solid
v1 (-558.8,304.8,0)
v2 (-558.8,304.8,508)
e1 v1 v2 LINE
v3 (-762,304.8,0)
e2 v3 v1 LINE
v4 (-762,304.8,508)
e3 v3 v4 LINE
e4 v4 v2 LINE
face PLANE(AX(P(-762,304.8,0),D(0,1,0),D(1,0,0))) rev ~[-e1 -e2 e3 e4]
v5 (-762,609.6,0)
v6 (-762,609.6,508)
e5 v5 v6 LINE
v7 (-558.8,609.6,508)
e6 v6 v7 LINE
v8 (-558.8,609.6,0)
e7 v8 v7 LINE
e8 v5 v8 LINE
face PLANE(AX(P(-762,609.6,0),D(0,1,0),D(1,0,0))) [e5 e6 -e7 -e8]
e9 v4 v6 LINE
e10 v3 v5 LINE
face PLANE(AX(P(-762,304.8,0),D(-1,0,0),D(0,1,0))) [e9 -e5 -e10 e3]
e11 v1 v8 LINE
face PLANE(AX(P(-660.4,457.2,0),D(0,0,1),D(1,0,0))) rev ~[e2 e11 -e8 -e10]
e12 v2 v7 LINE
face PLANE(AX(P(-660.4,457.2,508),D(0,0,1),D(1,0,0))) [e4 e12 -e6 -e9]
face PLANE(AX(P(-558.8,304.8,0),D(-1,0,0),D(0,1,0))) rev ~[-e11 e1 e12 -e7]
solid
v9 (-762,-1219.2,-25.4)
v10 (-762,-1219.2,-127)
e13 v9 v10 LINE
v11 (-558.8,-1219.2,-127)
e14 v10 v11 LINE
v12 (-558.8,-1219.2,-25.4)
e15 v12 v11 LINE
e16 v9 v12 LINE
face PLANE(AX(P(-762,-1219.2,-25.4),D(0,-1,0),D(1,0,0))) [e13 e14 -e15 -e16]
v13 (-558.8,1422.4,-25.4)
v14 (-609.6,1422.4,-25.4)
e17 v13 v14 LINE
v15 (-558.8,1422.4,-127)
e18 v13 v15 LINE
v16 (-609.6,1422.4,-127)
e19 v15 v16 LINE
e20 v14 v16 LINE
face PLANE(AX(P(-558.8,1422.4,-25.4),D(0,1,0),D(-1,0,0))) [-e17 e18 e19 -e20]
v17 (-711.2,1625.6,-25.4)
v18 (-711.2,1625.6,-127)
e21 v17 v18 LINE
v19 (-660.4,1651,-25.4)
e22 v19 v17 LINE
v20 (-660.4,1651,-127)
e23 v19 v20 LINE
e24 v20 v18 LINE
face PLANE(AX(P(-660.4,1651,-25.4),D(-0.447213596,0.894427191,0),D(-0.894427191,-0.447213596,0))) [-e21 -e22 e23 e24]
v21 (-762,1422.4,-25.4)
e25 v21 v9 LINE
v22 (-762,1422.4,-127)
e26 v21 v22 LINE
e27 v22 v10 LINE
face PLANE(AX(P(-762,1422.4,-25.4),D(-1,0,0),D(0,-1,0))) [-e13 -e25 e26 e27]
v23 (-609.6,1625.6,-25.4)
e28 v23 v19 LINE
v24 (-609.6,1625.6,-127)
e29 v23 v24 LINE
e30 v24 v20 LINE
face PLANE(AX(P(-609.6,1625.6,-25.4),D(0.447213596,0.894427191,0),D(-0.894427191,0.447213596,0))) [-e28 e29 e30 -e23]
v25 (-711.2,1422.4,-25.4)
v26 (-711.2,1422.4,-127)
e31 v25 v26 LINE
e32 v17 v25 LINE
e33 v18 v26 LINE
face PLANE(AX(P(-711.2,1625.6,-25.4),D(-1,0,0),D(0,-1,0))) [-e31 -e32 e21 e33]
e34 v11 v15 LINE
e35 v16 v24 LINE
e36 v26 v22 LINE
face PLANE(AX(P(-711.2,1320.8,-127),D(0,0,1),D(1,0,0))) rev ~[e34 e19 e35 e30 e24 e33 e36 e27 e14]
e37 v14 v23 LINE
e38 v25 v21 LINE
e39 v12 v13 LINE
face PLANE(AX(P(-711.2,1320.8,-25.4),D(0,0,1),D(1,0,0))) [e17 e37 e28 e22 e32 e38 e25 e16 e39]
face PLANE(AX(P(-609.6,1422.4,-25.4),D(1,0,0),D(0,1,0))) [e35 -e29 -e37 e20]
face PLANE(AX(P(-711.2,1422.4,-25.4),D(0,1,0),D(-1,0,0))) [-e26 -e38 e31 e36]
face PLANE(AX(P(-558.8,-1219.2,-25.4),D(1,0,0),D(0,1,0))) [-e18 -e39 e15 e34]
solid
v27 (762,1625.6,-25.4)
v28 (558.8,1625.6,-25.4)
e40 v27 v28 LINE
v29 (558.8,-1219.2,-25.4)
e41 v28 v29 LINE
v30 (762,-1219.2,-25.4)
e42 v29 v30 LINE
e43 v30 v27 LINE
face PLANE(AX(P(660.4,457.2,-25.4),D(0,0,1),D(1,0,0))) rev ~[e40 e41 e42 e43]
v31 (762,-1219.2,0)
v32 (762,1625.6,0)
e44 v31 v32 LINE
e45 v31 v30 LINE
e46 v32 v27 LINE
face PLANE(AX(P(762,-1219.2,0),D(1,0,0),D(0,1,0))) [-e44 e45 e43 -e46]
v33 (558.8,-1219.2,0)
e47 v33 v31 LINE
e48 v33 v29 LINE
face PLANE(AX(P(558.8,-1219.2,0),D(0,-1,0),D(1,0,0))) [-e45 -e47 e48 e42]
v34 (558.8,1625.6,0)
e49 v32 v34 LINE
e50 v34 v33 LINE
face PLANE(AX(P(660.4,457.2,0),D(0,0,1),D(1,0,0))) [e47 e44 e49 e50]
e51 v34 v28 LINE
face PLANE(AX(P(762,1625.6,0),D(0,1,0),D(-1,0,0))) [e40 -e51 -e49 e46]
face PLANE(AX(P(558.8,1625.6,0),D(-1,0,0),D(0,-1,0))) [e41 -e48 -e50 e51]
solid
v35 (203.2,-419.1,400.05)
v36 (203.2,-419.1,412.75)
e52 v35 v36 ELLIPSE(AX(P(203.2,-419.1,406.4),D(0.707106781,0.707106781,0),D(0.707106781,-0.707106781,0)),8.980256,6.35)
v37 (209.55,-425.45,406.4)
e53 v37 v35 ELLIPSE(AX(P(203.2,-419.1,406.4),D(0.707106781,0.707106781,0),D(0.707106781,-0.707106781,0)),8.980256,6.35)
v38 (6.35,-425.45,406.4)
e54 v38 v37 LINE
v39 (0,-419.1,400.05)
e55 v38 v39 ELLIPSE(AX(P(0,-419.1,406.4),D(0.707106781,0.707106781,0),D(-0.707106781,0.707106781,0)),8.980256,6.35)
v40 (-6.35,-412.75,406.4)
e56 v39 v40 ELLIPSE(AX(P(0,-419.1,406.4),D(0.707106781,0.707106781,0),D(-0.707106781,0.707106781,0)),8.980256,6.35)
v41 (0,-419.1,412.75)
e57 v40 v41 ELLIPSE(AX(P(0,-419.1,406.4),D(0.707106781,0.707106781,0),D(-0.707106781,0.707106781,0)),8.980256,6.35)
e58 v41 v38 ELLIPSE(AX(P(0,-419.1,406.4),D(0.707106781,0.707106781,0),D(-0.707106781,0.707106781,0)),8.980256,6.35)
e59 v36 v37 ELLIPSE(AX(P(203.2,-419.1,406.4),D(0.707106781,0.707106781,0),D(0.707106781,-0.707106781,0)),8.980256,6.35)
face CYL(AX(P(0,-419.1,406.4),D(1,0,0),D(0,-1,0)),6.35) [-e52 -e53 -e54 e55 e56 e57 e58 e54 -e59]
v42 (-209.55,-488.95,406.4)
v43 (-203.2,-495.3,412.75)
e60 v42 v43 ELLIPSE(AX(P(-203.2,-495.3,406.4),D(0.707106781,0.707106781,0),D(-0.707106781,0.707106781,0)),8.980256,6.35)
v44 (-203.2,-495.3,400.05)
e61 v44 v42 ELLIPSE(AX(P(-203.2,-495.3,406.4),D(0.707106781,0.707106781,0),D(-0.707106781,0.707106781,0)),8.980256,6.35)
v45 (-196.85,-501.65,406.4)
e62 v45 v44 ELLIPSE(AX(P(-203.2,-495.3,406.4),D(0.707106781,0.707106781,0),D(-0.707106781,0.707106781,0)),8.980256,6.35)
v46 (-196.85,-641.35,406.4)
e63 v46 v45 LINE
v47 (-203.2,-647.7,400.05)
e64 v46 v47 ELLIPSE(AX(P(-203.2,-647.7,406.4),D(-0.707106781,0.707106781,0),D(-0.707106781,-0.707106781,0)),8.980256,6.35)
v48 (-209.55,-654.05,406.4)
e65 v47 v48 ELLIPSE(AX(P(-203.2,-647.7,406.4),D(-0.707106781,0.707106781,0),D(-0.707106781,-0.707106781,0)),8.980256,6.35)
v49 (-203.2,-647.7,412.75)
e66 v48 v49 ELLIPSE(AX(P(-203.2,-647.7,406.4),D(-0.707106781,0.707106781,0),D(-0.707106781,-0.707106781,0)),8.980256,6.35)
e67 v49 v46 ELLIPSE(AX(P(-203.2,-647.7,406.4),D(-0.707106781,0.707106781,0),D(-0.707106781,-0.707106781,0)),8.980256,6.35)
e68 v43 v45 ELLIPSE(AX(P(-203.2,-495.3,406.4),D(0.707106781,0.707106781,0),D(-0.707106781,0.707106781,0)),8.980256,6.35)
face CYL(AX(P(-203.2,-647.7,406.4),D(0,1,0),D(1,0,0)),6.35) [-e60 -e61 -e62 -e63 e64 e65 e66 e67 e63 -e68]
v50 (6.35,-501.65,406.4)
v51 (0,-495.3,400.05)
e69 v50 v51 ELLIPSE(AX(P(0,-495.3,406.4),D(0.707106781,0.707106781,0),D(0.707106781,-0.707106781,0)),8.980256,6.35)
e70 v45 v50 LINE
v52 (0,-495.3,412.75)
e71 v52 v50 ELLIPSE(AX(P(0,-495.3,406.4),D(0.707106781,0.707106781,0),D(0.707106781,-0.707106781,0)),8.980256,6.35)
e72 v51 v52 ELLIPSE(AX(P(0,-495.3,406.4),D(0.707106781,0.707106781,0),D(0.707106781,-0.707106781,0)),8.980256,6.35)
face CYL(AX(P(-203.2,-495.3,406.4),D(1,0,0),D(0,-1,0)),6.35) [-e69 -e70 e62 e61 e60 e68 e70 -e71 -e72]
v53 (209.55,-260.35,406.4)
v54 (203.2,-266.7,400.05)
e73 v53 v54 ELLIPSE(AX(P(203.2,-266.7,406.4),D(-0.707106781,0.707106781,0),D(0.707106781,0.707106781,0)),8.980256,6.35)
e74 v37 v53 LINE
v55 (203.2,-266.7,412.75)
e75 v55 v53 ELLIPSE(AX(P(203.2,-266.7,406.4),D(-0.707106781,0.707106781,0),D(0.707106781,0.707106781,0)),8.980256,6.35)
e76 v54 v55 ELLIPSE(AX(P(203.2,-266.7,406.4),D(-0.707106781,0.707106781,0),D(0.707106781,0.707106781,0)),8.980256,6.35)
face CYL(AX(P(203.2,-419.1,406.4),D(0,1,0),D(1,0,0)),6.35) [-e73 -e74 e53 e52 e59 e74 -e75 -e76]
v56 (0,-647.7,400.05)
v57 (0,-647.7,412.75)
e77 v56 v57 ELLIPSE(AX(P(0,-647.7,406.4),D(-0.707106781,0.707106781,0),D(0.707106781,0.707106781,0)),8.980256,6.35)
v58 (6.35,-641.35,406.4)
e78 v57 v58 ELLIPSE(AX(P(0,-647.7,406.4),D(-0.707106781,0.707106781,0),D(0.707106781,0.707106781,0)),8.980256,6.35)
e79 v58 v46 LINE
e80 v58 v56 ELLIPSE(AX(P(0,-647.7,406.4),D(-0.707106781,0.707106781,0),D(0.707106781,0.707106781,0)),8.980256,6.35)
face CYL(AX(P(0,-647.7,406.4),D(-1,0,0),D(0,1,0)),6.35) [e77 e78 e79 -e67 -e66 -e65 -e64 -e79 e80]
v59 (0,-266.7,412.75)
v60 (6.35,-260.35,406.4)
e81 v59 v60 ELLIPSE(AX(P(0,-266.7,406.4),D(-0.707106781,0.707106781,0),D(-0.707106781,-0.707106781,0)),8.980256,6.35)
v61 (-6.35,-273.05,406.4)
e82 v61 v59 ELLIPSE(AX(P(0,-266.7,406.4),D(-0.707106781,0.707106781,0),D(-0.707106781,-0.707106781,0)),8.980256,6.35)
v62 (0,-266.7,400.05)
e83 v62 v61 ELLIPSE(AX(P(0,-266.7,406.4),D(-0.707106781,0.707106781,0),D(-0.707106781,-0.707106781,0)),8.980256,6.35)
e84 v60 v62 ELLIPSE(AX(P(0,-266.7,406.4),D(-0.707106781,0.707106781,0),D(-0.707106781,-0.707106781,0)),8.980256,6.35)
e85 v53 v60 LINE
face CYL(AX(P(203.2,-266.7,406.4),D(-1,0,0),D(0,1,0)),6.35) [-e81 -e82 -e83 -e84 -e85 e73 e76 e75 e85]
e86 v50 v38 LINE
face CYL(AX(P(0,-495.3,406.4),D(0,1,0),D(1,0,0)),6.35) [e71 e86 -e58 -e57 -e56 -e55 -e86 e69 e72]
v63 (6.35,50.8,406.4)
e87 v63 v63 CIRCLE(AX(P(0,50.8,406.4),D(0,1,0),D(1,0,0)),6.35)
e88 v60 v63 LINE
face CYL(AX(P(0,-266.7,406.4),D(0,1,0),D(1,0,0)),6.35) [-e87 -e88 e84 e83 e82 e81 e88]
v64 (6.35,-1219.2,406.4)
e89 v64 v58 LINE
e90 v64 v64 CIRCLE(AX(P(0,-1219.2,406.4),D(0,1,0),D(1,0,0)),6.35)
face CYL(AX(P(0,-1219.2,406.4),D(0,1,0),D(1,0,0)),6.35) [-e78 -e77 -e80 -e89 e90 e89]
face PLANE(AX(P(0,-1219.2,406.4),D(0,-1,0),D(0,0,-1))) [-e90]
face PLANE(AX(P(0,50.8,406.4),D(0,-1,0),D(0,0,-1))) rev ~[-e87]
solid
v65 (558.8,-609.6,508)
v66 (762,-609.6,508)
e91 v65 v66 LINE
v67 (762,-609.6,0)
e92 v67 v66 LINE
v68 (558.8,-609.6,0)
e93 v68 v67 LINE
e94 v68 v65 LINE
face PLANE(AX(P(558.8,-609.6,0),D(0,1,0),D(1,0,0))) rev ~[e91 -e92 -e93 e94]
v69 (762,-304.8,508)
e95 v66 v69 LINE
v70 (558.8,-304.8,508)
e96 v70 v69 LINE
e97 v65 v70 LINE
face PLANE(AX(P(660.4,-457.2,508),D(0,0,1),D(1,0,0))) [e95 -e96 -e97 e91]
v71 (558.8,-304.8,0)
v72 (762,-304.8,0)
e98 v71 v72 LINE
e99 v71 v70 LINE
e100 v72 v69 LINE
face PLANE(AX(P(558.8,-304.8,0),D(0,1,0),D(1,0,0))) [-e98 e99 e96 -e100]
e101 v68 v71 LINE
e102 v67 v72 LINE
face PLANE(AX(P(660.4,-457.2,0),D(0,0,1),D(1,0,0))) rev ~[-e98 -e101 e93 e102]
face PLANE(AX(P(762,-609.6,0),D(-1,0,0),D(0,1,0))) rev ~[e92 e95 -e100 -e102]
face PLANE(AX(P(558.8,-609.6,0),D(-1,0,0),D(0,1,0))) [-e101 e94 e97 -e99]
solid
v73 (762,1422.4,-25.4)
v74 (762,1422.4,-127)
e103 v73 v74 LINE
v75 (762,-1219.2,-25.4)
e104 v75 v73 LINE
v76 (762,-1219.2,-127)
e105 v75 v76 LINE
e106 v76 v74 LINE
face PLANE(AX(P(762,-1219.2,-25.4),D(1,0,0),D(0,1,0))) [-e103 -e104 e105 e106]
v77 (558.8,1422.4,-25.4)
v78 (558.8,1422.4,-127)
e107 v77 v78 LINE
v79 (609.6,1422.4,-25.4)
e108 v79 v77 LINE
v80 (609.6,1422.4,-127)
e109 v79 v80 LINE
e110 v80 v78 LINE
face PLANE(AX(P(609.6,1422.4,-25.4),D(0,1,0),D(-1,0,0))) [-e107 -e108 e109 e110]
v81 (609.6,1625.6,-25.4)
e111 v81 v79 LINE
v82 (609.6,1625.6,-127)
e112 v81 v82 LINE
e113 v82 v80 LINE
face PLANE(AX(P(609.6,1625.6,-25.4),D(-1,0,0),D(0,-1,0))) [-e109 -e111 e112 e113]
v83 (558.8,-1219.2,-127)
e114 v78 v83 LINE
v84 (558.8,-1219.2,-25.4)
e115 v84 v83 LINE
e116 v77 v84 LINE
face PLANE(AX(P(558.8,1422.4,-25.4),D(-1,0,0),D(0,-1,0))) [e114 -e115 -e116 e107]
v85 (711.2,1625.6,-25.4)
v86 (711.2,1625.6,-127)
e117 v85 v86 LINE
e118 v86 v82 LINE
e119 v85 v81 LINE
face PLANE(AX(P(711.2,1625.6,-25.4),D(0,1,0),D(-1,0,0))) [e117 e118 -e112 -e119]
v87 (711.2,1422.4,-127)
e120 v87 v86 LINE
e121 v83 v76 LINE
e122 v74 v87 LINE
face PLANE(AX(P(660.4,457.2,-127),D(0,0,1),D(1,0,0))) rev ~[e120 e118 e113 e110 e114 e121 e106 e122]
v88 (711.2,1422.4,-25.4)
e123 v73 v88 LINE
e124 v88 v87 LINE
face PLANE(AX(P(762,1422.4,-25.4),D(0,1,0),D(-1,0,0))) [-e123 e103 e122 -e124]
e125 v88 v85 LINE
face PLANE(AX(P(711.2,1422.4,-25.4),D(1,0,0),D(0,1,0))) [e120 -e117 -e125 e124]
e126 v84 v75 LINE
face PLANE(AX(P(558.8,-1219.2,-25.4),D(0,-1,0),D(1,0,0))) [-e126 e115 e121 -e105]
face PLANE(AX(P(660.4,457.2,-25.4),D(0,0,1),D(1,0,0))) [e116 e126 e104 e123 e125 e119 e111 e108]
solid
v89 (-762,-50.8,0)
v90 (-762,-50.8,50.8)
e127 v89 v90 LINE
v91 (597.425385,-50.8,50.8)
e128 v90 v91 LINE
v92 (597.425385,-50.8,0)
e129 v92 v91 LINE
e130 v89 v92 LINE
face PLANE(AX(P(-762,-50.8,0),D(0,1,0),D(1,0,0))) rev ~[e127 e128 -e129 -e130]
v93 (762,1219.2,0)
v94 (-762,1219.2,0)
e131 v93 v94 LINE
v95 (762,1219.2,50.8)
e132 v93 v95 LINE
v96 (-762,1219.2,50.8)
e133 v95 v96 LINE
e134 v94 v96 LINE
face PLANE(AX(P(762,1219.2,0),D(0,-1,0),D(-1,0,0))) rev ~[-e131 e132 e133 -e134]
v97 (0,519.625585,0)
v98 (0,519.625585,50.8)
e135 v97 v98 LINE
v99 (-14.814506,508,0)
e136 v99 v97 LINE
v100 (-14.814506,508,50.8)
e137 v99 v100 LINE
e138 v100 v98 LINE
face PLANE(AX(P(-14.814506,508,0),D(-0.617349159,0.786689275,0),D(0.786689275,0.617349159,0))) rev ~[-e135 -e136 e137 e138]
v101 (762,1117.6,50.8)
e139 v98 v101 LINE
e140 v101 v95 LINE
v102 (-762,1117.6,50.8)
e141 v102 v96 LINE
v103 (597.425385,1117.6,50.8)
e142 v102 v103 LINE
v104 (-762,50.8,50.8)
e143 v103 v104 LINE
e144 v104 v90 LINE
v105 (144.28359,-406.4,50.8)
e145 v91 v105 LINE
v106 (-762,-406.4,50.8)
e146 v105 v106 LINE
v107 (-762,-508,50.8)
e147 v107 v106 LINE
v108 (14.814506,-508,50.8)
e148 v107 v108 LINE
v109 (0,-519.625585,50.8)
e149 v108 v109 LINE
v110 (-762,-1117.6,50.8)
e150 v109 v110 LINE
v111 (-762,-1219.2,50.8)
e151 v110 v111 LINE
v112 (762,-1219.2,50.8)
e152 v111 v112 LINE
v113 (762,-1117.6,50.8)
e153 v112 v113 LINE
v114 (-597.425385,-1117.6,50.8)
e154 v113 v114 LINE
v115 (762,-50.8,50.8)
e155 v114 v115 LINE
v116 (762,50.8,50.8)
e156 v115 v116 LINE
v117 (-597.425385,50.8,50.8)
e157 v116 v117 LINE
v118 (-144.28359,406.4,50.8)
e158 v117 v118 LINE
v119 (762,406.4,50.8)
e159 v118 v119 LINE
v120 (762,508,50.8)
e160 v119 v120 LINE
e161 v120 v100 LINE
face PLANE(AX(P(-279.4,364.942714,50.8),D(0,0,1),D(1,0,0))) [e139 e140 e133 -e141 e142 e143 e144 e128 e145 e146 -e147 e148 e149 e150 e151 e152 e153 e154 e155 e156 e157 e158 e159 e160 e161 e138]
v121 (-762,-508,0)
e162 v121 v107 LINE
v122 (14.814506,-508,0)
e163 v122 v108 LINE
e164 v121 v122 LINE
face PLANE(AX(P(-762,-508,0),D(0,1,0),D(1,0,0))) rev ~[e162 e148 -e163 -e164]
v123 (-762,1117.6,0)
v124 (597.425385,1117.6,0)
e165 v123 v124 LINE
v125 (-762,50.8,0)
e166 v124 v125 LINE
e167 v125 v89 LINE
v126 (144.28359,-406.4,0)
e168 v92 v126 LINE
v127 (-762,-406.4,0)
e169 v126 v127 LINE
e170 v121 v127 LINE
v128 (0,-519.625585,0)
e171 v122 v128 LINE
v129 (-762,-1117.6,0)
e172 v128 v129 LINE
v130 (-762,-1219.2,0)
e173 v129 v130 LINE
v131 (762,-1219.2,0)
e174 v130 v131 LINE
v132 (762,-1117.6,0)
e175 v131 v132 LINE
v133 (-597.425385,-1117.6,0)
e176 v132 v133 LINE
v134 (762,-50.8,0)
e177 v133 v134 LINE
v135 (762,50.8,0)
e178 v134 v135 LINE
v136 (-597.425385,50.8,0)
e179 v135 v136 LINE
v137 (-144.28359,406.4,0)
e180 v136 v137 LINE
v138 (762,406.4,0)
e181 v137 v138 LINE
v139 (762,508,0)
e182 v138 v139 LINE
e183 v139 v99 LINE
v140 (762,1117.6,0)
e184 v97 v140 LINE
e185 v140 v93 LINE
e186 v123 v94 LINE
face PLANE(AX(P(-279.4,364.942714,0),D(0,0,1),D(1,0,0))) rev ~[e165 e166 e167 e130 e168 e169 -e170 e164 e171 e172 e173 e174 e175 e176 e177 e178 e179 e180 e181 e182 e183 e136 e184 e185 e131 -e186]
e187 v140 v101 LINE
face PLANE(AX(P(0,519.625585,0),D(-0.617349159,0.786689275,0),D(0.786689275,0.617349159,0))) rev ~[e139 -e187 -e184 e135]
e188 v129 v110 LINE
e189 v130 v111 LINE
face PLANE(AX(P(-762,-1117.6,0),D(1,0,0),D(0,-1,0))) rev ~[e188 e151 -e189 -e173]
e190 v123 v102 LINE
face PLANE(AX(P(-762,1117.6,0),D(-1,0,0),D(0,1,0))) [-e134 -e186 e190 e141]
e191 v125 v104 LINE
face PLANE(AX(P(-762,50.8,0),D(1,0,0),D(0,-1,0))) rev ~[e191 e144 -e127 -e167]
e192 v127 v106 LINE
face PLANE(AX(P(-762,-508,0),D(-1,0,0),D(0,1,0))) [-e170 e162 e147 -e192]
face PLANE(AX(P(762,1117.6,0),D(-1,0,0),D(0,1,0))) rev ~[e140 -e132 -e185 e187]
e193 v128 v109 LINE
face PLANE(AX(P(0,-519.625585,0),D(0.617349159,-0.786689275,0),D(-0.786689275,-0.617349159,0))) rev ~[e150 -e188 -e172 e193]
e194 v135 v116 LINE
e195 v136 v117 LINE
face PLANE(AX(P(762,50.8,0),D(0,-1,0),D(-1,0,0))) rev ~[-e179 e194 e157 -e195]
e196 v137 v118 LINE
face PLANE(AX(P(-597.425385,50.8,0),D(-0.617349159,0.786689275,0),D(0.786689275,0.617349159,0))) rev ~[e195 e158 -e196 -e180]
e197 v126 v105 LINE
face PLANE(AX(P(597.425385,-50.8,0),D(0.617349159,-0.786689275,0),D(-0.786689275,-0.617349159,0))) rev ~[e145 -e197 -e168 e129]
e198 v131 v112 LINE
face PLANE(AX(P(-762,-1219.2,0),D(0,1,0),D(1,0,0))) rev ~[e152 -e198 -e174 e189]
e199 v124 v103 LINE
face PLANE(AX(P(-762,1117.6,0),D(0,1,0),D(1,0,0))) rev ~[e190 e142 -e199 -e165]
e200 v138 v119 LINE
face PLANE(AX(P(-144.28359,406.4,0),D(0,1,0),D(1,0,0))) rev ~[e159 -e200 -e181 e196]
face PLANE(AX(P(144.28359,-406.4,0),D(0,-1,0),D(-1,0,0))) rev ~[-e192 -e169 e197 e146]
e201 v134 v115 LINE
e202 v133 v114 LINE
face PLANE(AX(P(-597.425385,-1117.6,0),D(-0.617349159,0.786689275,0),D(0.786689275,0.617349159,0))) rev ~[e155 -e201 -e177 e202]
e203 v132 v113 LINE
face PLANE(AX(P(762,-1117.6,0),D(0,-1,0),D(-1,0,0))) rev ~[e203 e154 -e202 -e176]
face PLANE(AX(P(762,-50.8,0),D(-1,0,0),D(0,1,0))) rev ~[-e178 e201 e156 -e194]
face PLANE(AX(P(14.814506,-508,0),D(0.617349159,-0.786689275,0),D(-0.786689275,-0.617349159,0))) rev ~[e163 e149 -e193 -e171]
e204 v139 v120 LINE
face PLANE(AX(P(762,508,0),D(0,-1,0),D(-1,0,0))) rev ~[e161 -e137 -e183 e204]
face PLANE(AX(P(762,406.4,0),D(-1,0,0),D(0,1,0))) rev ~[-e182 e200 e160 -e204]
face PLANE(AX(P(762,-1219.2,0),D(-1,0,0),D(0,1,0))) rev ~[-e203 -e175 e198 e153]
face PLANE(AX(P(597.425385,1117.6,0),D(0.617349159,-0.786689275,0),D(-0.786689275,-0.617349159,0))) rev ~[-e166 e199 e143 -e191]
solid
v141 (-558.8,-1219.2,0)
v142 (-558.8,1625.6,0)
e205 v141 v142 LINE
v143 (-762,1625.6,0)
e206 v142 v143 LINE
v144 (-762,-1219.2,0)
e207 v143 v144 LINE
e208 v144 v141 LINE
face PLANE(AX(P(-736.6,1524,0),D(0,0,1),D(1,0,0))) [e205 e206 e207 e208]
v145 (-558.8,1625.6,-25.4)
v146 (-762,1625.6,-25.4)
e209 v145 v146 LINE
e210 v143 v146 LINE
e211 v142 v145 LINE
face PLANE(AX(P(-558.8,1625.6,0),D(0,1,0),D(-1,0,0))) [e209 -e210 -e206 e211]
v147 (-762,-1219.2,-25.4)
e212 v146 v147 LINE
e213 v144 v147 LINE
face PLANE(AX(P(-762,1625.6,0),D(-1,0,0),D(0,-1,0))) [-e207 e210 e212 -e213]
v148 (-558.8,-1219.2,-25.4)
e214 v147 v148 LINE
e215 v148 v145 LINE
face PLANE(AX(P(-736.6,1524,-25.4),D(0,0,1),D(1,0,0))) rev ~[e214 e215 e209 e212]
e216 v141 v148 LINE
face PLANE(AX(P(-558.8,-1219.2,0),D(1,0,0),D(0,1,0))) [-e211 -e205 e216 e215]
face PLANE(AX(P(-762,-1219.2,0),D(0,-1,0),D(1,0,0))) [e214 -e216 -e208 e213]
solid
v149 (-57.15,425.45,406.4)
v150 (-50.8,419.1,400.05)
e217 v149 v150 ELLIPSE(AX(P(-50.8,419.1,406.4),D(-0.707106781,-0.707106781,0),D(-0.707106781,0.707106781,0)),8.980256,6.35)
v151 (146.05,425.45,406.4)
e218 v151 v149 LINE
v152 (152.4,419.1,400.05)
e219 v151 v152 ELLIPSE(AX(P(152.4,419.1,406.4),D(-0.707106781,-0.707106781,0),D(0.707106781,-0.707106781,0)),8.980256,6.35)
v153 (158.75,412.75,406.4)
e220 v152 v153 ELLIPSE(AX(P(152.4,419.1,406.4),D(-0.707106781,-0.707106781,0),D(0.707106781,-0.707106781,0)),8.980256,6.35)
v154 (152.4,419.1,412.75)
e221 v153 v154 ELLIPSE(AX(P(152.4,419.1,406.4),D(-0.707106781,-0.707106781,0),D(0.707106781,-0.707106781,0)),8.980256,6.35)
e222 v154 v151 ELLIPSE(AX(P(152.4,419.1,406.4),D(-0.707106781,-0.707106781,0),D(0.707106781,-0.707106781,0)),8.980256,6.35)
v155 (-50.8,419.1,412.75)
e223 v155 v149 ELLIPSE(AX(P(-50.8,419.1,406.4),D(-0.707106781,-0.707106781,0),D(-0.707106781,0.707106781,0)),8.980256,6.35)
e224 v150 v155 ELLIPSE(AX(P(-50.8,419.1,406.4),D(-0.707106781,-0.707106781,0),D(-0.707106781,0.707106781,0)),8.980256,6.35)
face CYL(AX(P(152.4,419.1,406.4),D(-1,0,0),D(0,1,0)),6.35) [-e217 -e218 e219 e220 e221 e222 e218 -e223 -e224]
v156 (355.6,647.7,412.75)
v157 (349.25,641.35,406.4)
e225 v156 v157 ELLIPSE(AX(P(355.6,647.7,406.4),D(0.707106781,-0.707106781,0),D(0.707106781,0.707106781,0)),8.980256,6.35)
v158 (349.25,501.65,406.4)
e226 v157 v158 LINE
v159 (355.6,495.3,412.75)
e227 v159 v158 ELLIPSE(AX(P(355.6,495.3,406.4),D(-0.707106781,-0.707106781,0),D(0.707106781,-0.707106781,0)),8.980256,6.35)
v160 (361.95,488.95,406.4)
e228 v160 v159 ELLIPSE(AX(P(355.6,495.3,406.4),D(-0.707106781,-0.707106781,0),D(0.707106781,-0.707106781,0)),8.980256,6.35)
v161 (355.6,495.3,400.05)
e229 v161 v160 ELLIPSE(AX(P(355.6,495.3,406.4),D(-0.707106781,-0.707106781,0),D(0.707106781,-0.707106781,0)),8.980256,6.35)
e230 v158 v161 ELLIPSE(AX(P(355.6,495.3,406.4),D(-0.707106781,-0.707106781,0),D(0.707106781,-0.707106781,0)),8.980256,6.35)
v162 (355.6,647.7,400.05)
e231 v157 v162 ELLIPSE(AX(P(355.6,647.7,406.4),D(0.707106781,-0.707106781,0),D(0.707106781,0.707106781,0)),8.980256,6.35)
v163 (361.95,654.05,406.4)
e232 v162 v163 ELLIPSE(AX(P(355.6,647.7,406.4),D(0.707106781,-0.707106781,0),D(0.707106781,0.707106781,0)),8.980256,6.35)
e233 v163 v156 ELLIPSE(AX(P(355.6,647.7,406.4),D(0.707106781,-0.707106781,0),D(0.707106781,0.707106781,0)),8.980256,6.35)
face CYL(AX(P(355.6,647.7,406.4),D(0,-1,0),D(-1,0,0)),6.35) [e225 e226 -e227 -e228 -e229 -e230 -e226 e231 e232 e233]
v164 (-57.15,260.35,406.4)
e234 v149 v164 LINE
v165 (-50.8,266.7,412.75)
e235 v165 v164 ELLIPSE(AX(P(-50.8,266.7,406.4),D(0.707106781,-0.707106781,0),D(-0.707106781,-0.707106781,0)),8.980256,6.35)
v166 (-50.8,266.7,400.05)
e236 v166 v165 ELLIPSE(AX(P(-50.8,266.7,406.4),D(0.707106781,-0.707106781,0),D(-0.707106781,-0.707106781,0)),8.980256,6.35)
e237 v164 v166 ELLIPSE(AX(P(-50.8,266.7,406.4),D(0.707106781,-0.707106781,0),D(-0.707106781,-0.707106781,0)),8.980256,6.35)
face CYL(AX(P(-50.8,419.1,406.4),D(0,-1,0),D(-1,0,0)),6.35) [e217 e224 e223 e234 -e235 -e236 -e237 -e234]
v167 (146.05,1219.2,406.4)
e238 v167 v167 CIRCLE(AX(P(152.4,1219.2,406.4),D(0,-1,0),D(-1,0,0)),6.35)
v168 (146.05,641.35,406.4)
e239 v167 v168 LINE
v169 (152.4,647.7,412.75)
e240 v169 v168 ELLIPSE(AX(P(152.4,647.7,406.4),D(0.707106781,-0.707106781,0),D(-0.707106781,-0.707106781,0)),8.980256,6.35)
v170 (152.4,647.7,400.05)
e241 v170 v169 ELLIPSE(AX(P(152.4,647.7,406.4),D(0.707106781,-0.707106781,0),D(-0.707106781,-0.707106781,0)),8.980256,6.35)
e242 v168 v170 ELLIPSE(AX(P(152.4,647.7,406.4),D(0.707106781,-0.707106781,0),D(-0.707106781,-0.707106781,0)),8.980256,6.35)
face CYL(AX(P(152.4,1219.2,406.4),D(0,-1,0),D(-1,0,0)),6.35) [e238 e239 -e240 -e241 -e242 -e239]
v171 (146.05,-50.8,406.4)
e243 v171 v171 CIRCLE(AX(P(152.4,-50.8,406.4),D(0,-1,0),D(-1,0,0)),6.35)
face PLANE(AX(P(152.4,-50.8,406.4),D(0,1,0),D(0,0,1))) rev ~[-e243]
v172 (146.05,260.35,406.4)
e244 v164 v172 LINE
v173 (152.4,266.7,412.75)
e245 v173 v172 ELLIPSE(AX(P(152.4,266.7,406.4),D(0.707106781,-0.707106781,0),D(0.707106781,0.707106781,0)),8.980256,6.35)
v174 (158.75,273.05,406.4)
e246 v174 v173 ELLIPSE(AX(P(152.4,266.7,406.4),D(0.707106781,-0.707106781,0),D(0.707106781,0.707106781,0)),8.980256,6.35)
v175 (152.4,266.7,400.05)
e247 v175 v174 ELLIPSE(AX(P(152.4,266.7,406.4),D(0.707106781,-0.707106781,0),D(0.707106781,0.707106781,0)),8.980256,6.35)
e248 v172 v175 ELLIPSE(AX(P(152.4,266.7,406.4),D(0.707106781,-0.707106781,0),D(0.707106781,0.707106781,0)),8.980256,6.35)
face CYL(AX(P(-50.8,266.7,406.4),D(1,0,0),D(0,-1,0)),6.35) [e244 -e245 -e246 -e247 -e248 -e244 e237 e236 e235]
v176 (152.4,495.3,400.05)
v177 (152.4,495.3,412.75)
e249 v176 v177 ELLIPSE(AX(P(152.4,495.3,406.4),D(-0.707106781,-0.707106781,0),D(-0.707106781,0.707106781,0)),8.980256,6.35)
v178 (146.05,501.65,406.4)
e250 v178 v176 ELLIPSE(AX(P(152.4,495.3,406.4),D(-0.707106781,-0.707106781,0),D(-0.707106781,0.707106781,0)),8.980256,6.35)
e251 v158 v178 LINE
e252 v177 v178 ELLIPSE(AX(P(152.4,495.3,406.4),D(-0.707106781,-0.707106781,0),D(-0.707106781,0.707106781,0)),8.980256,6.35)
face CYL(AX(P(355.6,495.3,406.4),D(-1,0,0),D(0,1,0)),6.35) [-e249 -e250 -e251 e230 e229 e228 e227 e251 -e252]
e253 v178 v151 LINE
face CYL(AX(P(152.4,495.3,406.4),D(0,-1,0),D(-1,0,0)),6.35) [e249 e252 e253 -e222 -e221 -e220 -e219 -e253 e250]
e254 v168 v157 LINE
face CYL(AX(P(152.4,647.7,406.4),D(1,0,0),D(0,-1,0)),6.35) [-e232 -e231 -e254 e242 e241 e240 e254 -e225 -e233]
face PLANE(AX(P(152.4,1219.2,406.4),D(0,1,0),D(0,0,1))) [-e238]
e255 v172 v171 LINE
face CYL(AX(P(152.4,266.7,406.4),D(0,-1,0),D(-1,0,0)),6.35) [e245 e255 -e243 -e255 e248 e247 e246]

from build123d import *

# Parameters (mm, degrees)
F2_START = -25.4
F1_W     = 203.2
F1_H     = 304.8
F1_H_2   = 1524
F2_DEPTH = 101.6
F1_H_3   = 609.6
F3_DEPTH = 508
F4_DEPTH = 508
F1_W_2   = 50.8
F1_H_4   = 203.2
F6_DEPTH = 25.4
F7_W     = 558.8
F7_H     = 101.6
F7_W_2   = 203.2
F8_DEPTH = 50.8
F12_R    = 6.35
F14_R    = 6.35


with BuildPart() as f2:
    # F1 (on Top) → F2 (new body)
    with BuildSketch(Plane.XY.offset(F2_START)):
        Polygon((-762, 1422.4), (-762, 1219.2), (-660.4, 1219.2), (-660.4, 1422.4), (-711.2, 1422.4), align=None)
        Polygon((-660.4, 1219.2), (-762, 1219.2), (-762, 609.6), (-558.8, 609.6), (-558.8, 1219.2), align=None)
        Polygon((-660.4, 1422.4), (-660.4, 1219.2), (-558.8, 1219.2), (-558.8, 1422.4), (-609.6, 1422.4), align=None)
        with Locations((-660.4, 457.2)):
            Rectangle(F1_W, F1_H)
        Polygon((-711.2, 1422.4), (-660.4, 1422.4), (-609.6, 1422.4), (-609.6, 1625.6), (-711.2, 1625.6), align=None)
        with Locations((-660.4, -457.2)):
            Rectangle(F1_W, F1_H_2)
        Polygon((-660.4, 1651), (-711.2, 1625.6), (-609.6, 1625.6), align=None)
    extrude(amount=-F2_DEPTH)


with BuildPart() as f2b:
    # F1 (on Top) → F2, piece 2 (new body)
    with BuildSketch(Plane.XY.offset(F2_START)):
        Polygon((660.4, 1219.2), (558.8, 1219.2), (558.8, -304.8), (762, -304.8), (762, 1219.2), align=None)
        Polygon((558.8, 1422.4), (558.8, 1219.2), (660.4, 1219.2), (660.4, 1422.4), (609.6, 1422.4), align=None)
        with Locations((660.4, -457.2)):
            Rectangle(F1_W, F1_H)
        Polygon((660.4, 1422.4), (660.4, 1219.2), (762, 1219.2), (762, 1422.4), (711.2, 1422.4), align=None)
        with Locations((660.4, -914.4)):
            Rectangle(F1_W, F1_H_3)
        Polygon((609.6, 1422.4), (660.4, 1422.4), (711.2, 1422.4), (711.2, 1625.6), (609.6, 1625.6), align=None)
    extrude(amount=-F2_DEPTH)


with BuildPart() as f3:
    # F1 (on Top) → F3 (new body)
    with BuildSketch(Plane.XY):
        with Locations((-660.4, 457.2)):
            Rectangle(F1_W, F1_H)
    extrude(amount=F3_DEPTH)


with BuildPart() as f4:
    # F1 (on Top) → F4 (new body)
    with BuildSketch(Plane.XY):
        with Locations((660.4, -457.2)):
            Rectangle(F1_W, F1_H)
    extrude(amount=F4_DEPTH)


with BuildPart() as f6:
    # F1 (on Top) → F6 (new body)
    with BuildSketch(Plane.XY):
        with Locations((-736.6, 1524)):
            Rectangle(F1_W_2, F1_H_4)
        Polygon((-711.2, 1422.4), (-660.4, 1422.4), (-609.6, 1422.4), (-609.6, 1625.6), (-711.2, 1625.6), align=None)
        with Locations((-584.2, 1524)):
            Rectangle(F1_W_2, F1_H_4)
        Polygon((-660.4, 1422.4), (-660.4, 1219.2), (-558.8, 1219.2), (-558.8, 1422.4), (-609.6, 1422.4), align=None)
        Polygon((-762, 1422.4), (-762, 1219.2), (-660.4, 1219.2), (-660.4, 1422.4), (-711.2, 1422.4), align=None)
        Polygon((-660.4, 1219.2), (-762, 1219.2), (-762, 609.6), (-558.8, 609.6), (-558.8, 1219.2), align=None)
        with Locations((-660.4, -457.2)):
            Rectangle(F1_W, F1_H_2)
        with Locations((-660.4, 457.2)):
            Rectangle(F1_W, F1_H)
    extrude(amount=-F6_DEPTH)


with BuildPart() as f6b:
    # F1 (on Top) → F6, piece 2 (new body)
    with BuildSketch(Plane.XY):
        Polygon((660.4, 1219.2), (558.8, 1219.2), (558.8, -304.8), (762, -304.8), (762, 1219.2), align=None)
        with Locations((660.4, -914.4)):
            Rectangle(F1_W, F1_H_3)
        with Locations((584.2, 1524)):
            Rectangle(F1_W_2, F1_H_4)
        Polygon((609.6, 1422.4), (660.4, 1422.4), (711.2, 1422.4), (711.2, 1625.6), (609.6, 1625.6), align=None)
        with Locations((736.6, 1524)):
            Rectangle(F1_W_2, F1_H_4)
        Polygon((660.4, 1422.4), (660.4, 1219.2), (762, 1219.2), (762, 1422.4), (711.2, 1422.4), align=None)
        Polygon((558.8, 1422.4), (558.8, 1219.2), (660.4, 1219.2), (660.4, 1422.4), (609.6, 1422.4), align=None)
        with Locations((660.4, -457.2)):
            Rectangle(F1_W, F1_H)
    extrude(amount=-F6_DEPTH)


with BuildPart() as f8:
    # F7 (on Top) → F8 (new body)
    with BuildSketch(Plane.XY):
        Polygon((0, 648.7744153468), (-558.8, 210.2598440925), (-558.8, 81.111013399), (-144.2835902197, 406.4), (-14.8145059026, 508), (0, 519.6255846532), align=None)
        Polygon((-558.8, 210.2598440925), (-762, 50.8), (-597.4253853296, 50.8), (-558.8, 81.111013399), align=None)
        Polygon((558.8, 1087.288986601), (0, 648.7744153468), (0, 519.6255846532), (558.8, 958.1401559075), align=None)
        Polygon((597.4253853296, 1117.6), (558.8, 1087.288986601), (558.8, 958.1401559075), (762, 1117.6), align=None)
        Polygon((762, 1219.2), (558.8, 1219.2), (558.8, 1117.6), (597.4253853296, 1117.6), (762, 1117.6), align=None)
        with Locations((279.4, 1168.4)):
            Rectangle(F7_W, F7_H)
        with Locations((-279.4, 1168.4)):
            Rectangle(F7_W, F7_H)
        with Locations((-660.4, 1168.4)):
            Rectangle(F7_W_2, F7_H)
        with Locations((-279.4, 0)):
            Rectangle(F7_W, F7_H)
        Polygon((-597.4253853296, 50.8), (-762, 50.8), (-762, -50.8), (-558.8, -50.8), (-558.8, 50.8), align=None)
        with Locations((279.4, 0)):
            Rectangle(F7_W, F7_H)
        Polygon((558.8, 50.8), (558.8, -50.8), (597.4253853296, -50.8), (762, -50.8), (762, 50.8), align=None)
        Polygon((558.8, -81.111013399), (144.2835902197, -406.4), (14.8145059026, -508), (0, -519.6255846533), (0, -648.7744153467), (558.8, -210.2598440925), align=None)
        Polygon((597.4253853296, -50.8), (558.8, -81.111013399), (558.8, -210.2598440925), (762, -50.8), align=None)
        Polygon((0, -519.6255846533), (-558.8, -958.1401559075), (-558.8, -1087.288986601), (0, -648.7744153467), align=None)
        Polygon((-558.8, -958.1401559075), (-762, -1117.6), (-597.4253853296, -1117.6), (-558.8, -1087.288986601), align=None)
        with Locations((-279.4, -1168.4)):
            Rectangle(F7_W, F7_H)
        Polygon((-597.4253853296, -1117.6), (-762, -1117.6), (-762, -1219.2), (-558.8, -1219.2), (-558.8, -1117.6), align=None)
        with Locations((279.4, -1168.4)):
            Rectangle(F7_W, F7_H)
        with Locations((660.4, -1168.4)):
            Rectangle(F7_W_2, F7_H)
        with Locations((-279.4, -457.2)):
            Rectangle(F7_W, F7_H)
        with Locations((-660.4, -457.2)):
            Rectangle(F7_W_2, F7_H)
        Polygon((144.2835902197, -406.4), (0, -406.4), (0, -508), (14.8145059026, -508), align=None)
        Polygon((-14.8145059026, 508), (-144.2835902197, 406.4), (0, 406.4), (0, 508), align=None)
        with Locations((660.4, 457.2)):
            Rectangle(F7_W_2, F7_H)
        with Locations((279.4, 457.2)):
            Rectangle(F7_W, F7_H)
    extrude(amount=F8_DEPTH)


with BuildPart() as f13:
    # F13: sweep along a path in F5
    with BuildLine(Plane.XY.offset(406.4)) as f13_path:
        Line((152.4, 1219.2), (152.4, 647.7))
        Line((152.4, 647.7), (355.6, 647.7))
        Line((355.6, 647.7), (355.6, 495.3))
        Line((355.6, 495.3), (152.4, 495.3))
        Line((152.4, 495.3), (152.4, 419.1))
        Line((152.4, 419.1), (-50.8, 419.1))
        Line((-50.8, 419.1), (-50.8, 266.7))
        Line((-50.8, 266.7), (152.4, 266.7))
        Line((152.4, 266.7), (152.4, -50.8))
    # F12 (on offset) → F13 (sweep)
    with BuildSketch(Plane(origin=(0, 1219.2, 0), x_dir=(-1, 0, 0), z_dir=(0, 1, 0))):
        with Locations((-152.4, 406.4)):
            Circle(F12_R)
    sweep(path=f13_path.line, transition=Transition.RIGHT)


with BuildPart() as f15:
    # F15: sweep along a path in F5
    with BuildLine(Plane.XY.offset(406.4)) as f15_path:
        Line((0, -1219.2), (0, -647.7))
        Line((0, -647.7), (-203.2, -647.7))
        Line((-203.2, -647.7), (-203.2, -495.3))
        Line((-203.2, -495.3), (0, -495.3))
        Line((0, -495.3), (0, -419.1))
        Line((0, -419.1), (203.2, -419.1))
        Line((203.2, -419.1), (203.2, -266.7))
        Line((203.2, -266.7), (0, -266.7))
        Line((0, -266.7), (0, 50.8))
    # F14 (on offset) → F15 (sweep)
    with BuildSketch(Plane.XZ.offset(1219.2)):
        with Locations((0, 406.4)):
            Circle(F14_R)
    sweep(path=f15_path.line, transition=Transition.RIGHT)


solid = Compound([f2.part, f2b.part, f3.part, f4.part, f6.part, f6b.part, f8.part, f13.part, f15.part])
